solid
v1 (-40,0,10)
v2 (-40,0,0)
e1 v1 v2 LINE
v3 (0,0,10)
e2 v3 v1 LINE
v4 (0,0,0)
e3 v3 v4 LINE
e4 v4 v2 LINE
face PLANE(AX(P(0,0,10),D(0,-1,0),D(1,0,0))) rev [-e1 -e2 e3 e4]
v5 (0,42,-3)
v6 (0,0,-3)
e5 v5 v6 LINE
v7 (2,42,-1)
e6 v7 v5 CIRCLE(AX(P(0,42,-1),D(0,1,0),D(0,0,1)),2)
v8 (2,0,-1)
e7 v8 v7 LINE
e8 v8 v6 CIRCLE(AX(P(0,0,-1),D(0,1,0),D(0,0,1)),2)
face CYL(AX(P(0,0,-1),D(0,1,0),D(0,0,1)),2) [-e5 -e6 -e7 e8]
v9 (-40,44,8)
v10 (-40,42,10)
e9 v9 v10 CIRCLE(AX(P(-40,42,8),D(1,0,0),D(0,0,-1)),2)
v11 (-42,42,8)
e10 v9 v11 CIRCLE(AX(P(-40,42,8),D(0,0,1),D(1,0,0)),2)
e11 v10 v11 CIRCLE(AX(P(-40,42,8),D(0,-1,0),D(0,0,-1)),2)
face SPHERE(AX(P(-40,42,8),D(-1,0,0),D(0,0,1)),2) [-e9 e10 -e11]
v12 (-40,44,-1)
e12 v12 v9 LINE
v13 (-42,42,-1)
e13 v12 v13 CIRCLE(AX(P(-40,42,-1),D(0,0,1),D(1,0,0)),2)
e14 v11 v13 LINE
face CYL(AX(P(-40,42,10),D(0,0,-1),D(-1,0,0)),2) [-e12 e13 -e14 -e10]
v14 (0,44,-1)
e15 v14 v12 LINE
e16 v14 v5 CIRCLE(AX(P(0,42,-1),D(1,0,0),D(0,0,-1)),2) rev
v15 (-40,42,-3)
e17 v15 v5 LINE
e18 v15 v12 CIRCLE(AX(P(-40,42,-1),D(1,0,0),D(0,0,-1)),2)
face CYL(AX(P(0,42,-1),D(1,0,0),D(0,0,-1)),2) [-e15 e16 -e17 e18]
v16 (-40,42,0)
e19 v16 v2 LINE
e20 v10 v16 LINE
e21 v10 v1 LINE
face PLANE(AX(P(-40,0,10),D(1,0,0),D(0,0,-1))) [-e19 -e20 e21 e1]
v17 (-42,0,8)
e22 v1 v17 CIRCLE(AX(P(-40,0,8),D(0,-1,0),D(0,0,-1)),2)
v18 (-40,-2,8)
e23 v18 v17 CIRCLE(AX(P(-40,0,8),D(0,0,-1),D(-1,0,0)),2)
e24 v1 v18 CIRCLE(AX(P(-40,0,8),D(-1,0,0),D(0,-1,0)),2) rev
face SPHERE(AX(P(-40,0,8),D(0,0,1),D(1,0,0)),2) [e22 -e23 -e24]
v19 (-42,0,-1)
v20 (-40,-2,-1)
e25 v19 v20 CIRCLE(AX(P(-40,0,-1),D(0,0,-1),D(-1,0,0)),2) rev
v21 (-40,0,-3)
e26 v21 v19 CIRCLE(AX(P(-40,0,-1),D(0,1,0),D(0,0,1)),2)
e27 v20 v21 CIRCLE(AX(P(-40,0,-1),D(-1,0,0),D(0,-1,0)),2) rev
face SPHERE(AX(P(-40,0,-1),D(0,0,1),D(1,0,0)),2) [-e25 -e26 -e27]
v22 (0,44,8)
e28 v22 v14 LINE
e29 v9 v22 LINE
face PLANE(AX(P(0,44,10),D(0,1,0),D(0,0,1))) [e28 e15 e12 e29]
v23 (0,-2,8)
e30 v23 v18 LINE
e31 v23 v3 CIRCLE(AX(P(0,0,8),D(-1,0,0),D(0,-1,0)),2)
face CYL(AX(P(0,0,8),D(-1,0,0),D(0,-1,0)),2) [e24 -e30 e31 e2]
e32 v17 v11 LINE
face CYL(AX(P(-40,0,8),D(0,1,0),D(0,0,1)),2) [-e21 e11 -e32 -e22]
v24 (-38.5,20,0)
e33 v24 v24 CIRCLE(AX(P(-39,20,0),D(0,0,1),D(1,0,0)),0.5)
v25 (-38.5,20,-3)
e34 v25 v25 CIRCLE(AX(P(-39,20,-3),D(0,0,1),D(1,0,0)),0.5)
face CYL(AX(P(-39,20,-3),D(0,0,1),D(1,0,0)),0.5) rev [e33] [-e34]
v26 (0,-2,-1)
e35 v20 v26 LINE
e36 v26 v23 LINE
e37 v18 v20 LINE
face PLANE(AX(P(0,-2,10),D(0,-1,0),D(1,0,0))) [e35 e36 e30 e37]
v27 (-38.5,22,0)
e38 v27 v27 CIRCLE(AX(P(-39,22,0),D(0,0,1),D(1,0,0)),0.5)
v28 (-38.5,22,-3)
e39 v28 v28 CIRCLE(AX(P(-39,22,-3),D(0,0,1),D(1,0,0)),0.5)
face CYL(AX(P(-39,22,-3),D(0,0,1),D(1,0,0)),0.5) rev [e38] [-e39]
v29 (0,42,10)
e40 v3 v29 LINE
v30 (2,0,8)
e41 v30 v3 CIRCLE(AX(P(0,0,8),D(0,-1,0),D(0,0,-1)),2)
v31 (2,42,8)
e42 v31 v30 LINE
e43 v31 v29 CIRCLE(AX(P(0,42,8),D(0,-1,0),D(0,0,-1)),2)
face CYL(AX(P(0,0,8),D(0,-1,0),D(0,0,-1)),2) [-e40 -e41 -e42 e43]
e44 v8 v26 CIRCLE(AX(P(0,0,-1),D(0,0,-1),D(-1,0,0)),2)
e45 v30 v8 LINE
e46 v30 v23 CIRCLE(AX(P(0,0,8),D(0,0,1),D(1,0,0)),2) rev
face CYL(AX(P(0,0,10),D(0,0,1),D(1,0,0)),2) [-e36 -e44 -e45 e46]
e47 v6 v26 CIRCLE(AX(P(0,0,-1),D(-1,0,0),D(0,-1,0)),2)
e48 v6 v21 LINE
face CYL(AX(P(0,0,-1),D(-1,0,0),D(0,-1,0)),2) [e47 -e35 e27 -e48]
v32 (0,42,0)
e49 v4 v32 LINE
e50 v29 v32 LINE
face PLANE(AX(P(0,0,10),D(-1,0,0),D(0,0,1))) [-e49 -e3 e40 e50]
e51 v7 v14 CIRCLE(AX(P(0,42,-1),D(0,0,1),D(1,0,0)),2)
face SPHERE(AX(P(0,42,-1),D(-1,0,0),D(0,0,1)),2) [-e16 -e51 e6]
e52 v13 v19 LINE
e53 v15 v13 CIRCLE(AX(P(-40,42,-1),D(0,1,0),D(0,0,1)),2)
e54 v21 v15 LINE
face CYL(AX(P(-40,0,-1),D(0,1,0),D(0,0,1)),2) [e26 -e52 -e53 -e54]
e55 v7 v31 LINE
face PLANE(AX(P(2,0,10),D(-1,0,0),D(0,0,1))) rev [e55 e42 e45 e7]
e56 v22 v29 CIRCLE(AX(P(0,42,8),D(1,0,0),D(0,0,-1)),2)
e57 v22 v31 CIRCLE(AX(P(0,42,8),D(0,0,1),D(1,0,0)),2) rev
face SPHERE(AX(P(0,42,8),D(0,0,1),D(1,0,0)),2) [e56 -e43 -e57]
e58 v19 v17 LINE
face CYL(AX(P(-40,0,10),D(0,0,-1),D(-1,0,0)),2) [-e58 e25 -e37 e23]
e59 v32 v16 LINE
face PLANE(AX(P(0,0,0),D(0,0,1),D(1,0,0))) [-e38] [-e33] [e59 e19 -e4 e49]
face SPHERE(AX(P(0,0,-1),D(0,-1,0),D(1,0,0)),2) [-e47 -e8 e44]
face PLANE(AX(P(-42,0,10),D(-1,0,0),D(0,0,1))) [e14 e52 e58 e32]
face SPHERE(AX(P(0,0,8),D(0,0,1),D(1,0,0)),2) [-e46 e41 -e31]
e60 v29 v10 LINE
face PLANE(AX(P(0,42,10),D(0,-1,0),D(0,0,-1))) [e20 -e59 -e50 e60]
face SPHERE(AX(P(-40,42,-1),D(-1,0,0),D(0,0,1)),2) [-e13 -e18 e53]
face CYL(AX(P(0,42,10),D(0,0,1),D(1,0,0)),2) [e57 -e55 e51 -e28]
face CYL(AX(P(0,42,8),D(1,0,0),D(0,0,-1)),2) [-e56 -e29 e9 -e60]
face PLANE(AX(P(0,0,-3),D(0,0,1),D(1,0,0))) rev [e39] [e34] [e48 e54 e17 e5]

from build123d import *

# Parameters (mm, degrees)
SKETCH_1_W          = 40
SKETCH_1_H          = 42
EXTRUDE_1_DEPTH     = 10
SKETCH_2_W          = 44
SKETCH_2_H          = 46
EXTRUDE_2_DEPTH     = 3
FILLET_1_R          = 2
FILLET_2_R          = 2
FILLET_3_R          = 2
FILLET_4_R          = 2
FILLET_5_R          = 2
SKETCH_4_R          = 0.5
CUT_EXTRUDE_1_DEPTH = 3


# Some blends are built 0.0001 mm under size
with BuildPart() as part:
    # 草图1 → 凸台-拉伸1 (new body)
    with BuildSketch(Plane.XY):
        Polygon((-42, -2), (0, -2), (2, -2), (2, 44), (-42, 44), align=None)
        with Locations((-20, 21)):
            Rectangle(SKETCH_1_W, SKETCH_1_H, mode=Mode.SUBTRACT)
    extrude(amount=EXTRUDE_1_DEPTH)

    # 草图2 → 凸台-拉伸2 (add)
    with BuildSketch(Plane.XY):
        with Locations((-20, 21)):
            Rectangle(SKETCH_2_W, SKETCH_2_H)
    extrude(amount=-EXTRUDE_2_DEPTH)

    # 圆角1
    fillet_1_edges = [part.edges().sort_by_distance(p)[0] for p in [
        (-20, 44, -3),
    ]]
    fillet(fillet_1_edges, radius=FILLET_1_R)

    # 圆角2
    fillet_2_edges = [part.edges().sort_by_distance(p)[0] for p in [
        (2, 44, 4.5),
        (2, 20, -3),
        (2, 43.414213562, -2.414213562),
    ]]
    fillet(fillet_2_edges, radius=FILLET_2_R)

    # 圆角3
    fillet_3_edges = [part.edges().sort_by_distance(p)[0] for p in [
        (-42, -2, 3.5),
        (2, -2, 4.5),
        (-21, -2, -3),
        (1.414213562, -2, -2.414213562),
        (-20, -2, 10),
    ]]
    fillet(fillet_3_edges, radius=FILLET_3_R - 0.0001)  # a hair under: the kernel refuses the full size

    # 圆角4
    # the kernel refuses this fillet: 2 mm, written as the material it takes off along each edge
    with BuildSketch(Plane(origin=(0, -2, 8), x_dir=(1, 0, 0), z_dir=(0, 0, -1))) as fillet_4_piece_1:
        with BuildLine():
            CenterArc((0.0001, -1.9999), 1.9999, 0, 90)
            Line((2, -1.9999), (2, 0))
            Line((2, 0), (0.0001, 0))
        make_face()
    revolve(axis=Axis((0, -2, 8), (0, -1, 0)), revolution_arc=90, mode=Mode.SUBTRACT)
    with BuildSketch(Plane(origin=(0, 44, 10), x_dir=(0, -1, 0), z_dir=(-1, 0, 0))) as fillet_4_piece_2:
        with BuildLine():
            CenterArc((FILLET_4_R, -FILLET_4_R), FILLET_4_R, 90, 90)
            Line((0, -FILLET_4_R), (0, 0))
            Line((0, 0), (FILLET_4_R, 0))
        make_face()
    extrude(amount=47, mode=Mode.SUBTRACT)
    with BuildSketch(Plane(origin=(0, 42, 10), x_dir=(0, 1, 0), z_dir=(-1, 0, 0))) as fillet_4_piece_3:
        with BuildLine():
            CenterArc((2 - FILLET_4_R, FILLET_4_R), FILLET_4_R, 270, 90)
            Line((2, FILLET_4_R), (2, 0))
            Line((2, 0), (2 - FILLET_4_R, 0))
        make_face()
    revolve(axis=Axis((0, 42, 10), (0, 0, -1)), revolution_arc=90, mode=Mode.SUBTRACT)
    with BuildSketch(Plane(origin=(2, -2, 10), x_dir=(-1, 0, 0), z_dir=(0, 1, 0))) as fillet_4_piece_4:
        with BuildLine():
            CenterArc((FILLET_4_R, -FILLET_4_R), FILLET_4_R, 90, 90)
            Line((0, -FILLET_4_R), (0, 0))
            Line((0, 0), (FILLET_4_R, 0))
        make_face()
    extrude(amount=44, mode=Mode.SUBTRACT)

    # 圆角5
    # the kernel refuses this fillet: 2 mm, written as the material it takes off along each edge
    with BuildSketch(Plane(origin=(-40, -2, 8), x_dir=(0, 0, 1), z_dir=(1, 0, 0))) as fillet_5_piece_1:
        with BuildLine():
            CenterArc((0.0001, -1.9999), 1.9999, 0, 90)
            Line((2, -1.9999), (2, 0))
            Line((2, 0), (0.0001, 0))
        make_face()
    revolve(axis=Axis((-40, -2, 8), (0, -1, 0)), revolution_arc=90, mode=Mode.SUBTRACT)
    with BuildSketch(Plane(origin=(-40, -2, -1), x_dir=(-1, 0, 0), z_dir=(0, 0, 1))) as fillet_5_piece_2:
        with BuildLine():
            CenterArc((0.0001, -1.9999), 1.9999, 0, 90)
            Line((2, -1.9999), (2, 0))
            Line((2, 0), (0.0001, 0))
        make_face()
    revolve(axis=Axis((-40, -2, -1), (0, -1, 0)), revolution_arc=90, mode=Mode.SUBTRACT)
    with BuildSketch(Plane(origin=(-42, 42, 10), x_dir=(0, 0, -1), z_dir=(0, -1, 0)), Plane(origin=(-42, -2, -3), x_dir=(0, 0, 1), z_dir=(0, 1, 0))) as fillet_5_piece_3:
        with BuildLine():
            CenterArc((FILLET_5_R, FILLET_5_R), FILLET_5_R, 180, 90)
            Line((0, FILLET_5_R), (0, 0))
            Line((0, 0), (FILLET_5_R, 0))
        make_face()
    extrude(amount=44, mode=Mode.SUBTRACT)
    with BuildSketch(Plane(origin=(-42, 42, 8), x_dir=(0, 1, 0), z_dir=(0, 0, -1))) as fillet_5_piece_4:
        with BuildLine():
            CenterArc((2 - FILLET_5_R, FILLET_5_R), FILLET_5_R, 270, 90)
            Line((2, FILLET_5_R), (2, 0))
            Line((2, 0), (2 - FILLET_5_R, 0))
        make_face()
    revolve(axis=Axis((-42, 42, 8), (1, 0, 0)), revolution_arc=90, mode=Mode.SUBTRACT)
    with BuildSketch(Plane(origin=(-42, 44, -1), x_dir=(0, -1, 0), z_dir=(0, 0, 1))) as fillet_5_piece_5:
        with BuildLine():
            CenterArc((FILLET_5_R, FILLET_5_R), FILLET_5_R, 180, 90)
            Line((0, FILLET_5_R), (0, 0))
            Line((0, 0), (FILLET_5_R, 0))
        make_face()
    extrude(amount=9, mode=Mode.SUBTRACT)
    with BuildSketch(Plane(origin=(-42, 42, -1), x_dir=(0, 1, 0), z_dir=(0, 0, 1))) as fillet_5_piece_6:
        with BuildLine():
            CenterArc((2 - FILLET_5_R, -FILLET_5_R), FILLET_5_R, 0, 90)
            Line((2, -FILLET_5_R), (2, 0))
            Line((2, 0), (2 - FILLET_5_R, 0))
        make_face()
    revolve(axis=Axis((-42, 42, -1), (-1, 0, 0)), revolution_arc=90, mode=Mode.SUBTRACT)

    # 草图4 → 切除-拉伸1 (cut)
    with BuildSketch(Plane.XY):
        with Locations((-39, 22)):
            Circle(SKETCH_4_R)
        with Locations((-39, 20)):
            Circle(SKETCH_4_R)
    extrude(amount=-CUT_EXTRUDE_1_DEPTH, mode=Mode.SUBTRACT)


solid = part.part
